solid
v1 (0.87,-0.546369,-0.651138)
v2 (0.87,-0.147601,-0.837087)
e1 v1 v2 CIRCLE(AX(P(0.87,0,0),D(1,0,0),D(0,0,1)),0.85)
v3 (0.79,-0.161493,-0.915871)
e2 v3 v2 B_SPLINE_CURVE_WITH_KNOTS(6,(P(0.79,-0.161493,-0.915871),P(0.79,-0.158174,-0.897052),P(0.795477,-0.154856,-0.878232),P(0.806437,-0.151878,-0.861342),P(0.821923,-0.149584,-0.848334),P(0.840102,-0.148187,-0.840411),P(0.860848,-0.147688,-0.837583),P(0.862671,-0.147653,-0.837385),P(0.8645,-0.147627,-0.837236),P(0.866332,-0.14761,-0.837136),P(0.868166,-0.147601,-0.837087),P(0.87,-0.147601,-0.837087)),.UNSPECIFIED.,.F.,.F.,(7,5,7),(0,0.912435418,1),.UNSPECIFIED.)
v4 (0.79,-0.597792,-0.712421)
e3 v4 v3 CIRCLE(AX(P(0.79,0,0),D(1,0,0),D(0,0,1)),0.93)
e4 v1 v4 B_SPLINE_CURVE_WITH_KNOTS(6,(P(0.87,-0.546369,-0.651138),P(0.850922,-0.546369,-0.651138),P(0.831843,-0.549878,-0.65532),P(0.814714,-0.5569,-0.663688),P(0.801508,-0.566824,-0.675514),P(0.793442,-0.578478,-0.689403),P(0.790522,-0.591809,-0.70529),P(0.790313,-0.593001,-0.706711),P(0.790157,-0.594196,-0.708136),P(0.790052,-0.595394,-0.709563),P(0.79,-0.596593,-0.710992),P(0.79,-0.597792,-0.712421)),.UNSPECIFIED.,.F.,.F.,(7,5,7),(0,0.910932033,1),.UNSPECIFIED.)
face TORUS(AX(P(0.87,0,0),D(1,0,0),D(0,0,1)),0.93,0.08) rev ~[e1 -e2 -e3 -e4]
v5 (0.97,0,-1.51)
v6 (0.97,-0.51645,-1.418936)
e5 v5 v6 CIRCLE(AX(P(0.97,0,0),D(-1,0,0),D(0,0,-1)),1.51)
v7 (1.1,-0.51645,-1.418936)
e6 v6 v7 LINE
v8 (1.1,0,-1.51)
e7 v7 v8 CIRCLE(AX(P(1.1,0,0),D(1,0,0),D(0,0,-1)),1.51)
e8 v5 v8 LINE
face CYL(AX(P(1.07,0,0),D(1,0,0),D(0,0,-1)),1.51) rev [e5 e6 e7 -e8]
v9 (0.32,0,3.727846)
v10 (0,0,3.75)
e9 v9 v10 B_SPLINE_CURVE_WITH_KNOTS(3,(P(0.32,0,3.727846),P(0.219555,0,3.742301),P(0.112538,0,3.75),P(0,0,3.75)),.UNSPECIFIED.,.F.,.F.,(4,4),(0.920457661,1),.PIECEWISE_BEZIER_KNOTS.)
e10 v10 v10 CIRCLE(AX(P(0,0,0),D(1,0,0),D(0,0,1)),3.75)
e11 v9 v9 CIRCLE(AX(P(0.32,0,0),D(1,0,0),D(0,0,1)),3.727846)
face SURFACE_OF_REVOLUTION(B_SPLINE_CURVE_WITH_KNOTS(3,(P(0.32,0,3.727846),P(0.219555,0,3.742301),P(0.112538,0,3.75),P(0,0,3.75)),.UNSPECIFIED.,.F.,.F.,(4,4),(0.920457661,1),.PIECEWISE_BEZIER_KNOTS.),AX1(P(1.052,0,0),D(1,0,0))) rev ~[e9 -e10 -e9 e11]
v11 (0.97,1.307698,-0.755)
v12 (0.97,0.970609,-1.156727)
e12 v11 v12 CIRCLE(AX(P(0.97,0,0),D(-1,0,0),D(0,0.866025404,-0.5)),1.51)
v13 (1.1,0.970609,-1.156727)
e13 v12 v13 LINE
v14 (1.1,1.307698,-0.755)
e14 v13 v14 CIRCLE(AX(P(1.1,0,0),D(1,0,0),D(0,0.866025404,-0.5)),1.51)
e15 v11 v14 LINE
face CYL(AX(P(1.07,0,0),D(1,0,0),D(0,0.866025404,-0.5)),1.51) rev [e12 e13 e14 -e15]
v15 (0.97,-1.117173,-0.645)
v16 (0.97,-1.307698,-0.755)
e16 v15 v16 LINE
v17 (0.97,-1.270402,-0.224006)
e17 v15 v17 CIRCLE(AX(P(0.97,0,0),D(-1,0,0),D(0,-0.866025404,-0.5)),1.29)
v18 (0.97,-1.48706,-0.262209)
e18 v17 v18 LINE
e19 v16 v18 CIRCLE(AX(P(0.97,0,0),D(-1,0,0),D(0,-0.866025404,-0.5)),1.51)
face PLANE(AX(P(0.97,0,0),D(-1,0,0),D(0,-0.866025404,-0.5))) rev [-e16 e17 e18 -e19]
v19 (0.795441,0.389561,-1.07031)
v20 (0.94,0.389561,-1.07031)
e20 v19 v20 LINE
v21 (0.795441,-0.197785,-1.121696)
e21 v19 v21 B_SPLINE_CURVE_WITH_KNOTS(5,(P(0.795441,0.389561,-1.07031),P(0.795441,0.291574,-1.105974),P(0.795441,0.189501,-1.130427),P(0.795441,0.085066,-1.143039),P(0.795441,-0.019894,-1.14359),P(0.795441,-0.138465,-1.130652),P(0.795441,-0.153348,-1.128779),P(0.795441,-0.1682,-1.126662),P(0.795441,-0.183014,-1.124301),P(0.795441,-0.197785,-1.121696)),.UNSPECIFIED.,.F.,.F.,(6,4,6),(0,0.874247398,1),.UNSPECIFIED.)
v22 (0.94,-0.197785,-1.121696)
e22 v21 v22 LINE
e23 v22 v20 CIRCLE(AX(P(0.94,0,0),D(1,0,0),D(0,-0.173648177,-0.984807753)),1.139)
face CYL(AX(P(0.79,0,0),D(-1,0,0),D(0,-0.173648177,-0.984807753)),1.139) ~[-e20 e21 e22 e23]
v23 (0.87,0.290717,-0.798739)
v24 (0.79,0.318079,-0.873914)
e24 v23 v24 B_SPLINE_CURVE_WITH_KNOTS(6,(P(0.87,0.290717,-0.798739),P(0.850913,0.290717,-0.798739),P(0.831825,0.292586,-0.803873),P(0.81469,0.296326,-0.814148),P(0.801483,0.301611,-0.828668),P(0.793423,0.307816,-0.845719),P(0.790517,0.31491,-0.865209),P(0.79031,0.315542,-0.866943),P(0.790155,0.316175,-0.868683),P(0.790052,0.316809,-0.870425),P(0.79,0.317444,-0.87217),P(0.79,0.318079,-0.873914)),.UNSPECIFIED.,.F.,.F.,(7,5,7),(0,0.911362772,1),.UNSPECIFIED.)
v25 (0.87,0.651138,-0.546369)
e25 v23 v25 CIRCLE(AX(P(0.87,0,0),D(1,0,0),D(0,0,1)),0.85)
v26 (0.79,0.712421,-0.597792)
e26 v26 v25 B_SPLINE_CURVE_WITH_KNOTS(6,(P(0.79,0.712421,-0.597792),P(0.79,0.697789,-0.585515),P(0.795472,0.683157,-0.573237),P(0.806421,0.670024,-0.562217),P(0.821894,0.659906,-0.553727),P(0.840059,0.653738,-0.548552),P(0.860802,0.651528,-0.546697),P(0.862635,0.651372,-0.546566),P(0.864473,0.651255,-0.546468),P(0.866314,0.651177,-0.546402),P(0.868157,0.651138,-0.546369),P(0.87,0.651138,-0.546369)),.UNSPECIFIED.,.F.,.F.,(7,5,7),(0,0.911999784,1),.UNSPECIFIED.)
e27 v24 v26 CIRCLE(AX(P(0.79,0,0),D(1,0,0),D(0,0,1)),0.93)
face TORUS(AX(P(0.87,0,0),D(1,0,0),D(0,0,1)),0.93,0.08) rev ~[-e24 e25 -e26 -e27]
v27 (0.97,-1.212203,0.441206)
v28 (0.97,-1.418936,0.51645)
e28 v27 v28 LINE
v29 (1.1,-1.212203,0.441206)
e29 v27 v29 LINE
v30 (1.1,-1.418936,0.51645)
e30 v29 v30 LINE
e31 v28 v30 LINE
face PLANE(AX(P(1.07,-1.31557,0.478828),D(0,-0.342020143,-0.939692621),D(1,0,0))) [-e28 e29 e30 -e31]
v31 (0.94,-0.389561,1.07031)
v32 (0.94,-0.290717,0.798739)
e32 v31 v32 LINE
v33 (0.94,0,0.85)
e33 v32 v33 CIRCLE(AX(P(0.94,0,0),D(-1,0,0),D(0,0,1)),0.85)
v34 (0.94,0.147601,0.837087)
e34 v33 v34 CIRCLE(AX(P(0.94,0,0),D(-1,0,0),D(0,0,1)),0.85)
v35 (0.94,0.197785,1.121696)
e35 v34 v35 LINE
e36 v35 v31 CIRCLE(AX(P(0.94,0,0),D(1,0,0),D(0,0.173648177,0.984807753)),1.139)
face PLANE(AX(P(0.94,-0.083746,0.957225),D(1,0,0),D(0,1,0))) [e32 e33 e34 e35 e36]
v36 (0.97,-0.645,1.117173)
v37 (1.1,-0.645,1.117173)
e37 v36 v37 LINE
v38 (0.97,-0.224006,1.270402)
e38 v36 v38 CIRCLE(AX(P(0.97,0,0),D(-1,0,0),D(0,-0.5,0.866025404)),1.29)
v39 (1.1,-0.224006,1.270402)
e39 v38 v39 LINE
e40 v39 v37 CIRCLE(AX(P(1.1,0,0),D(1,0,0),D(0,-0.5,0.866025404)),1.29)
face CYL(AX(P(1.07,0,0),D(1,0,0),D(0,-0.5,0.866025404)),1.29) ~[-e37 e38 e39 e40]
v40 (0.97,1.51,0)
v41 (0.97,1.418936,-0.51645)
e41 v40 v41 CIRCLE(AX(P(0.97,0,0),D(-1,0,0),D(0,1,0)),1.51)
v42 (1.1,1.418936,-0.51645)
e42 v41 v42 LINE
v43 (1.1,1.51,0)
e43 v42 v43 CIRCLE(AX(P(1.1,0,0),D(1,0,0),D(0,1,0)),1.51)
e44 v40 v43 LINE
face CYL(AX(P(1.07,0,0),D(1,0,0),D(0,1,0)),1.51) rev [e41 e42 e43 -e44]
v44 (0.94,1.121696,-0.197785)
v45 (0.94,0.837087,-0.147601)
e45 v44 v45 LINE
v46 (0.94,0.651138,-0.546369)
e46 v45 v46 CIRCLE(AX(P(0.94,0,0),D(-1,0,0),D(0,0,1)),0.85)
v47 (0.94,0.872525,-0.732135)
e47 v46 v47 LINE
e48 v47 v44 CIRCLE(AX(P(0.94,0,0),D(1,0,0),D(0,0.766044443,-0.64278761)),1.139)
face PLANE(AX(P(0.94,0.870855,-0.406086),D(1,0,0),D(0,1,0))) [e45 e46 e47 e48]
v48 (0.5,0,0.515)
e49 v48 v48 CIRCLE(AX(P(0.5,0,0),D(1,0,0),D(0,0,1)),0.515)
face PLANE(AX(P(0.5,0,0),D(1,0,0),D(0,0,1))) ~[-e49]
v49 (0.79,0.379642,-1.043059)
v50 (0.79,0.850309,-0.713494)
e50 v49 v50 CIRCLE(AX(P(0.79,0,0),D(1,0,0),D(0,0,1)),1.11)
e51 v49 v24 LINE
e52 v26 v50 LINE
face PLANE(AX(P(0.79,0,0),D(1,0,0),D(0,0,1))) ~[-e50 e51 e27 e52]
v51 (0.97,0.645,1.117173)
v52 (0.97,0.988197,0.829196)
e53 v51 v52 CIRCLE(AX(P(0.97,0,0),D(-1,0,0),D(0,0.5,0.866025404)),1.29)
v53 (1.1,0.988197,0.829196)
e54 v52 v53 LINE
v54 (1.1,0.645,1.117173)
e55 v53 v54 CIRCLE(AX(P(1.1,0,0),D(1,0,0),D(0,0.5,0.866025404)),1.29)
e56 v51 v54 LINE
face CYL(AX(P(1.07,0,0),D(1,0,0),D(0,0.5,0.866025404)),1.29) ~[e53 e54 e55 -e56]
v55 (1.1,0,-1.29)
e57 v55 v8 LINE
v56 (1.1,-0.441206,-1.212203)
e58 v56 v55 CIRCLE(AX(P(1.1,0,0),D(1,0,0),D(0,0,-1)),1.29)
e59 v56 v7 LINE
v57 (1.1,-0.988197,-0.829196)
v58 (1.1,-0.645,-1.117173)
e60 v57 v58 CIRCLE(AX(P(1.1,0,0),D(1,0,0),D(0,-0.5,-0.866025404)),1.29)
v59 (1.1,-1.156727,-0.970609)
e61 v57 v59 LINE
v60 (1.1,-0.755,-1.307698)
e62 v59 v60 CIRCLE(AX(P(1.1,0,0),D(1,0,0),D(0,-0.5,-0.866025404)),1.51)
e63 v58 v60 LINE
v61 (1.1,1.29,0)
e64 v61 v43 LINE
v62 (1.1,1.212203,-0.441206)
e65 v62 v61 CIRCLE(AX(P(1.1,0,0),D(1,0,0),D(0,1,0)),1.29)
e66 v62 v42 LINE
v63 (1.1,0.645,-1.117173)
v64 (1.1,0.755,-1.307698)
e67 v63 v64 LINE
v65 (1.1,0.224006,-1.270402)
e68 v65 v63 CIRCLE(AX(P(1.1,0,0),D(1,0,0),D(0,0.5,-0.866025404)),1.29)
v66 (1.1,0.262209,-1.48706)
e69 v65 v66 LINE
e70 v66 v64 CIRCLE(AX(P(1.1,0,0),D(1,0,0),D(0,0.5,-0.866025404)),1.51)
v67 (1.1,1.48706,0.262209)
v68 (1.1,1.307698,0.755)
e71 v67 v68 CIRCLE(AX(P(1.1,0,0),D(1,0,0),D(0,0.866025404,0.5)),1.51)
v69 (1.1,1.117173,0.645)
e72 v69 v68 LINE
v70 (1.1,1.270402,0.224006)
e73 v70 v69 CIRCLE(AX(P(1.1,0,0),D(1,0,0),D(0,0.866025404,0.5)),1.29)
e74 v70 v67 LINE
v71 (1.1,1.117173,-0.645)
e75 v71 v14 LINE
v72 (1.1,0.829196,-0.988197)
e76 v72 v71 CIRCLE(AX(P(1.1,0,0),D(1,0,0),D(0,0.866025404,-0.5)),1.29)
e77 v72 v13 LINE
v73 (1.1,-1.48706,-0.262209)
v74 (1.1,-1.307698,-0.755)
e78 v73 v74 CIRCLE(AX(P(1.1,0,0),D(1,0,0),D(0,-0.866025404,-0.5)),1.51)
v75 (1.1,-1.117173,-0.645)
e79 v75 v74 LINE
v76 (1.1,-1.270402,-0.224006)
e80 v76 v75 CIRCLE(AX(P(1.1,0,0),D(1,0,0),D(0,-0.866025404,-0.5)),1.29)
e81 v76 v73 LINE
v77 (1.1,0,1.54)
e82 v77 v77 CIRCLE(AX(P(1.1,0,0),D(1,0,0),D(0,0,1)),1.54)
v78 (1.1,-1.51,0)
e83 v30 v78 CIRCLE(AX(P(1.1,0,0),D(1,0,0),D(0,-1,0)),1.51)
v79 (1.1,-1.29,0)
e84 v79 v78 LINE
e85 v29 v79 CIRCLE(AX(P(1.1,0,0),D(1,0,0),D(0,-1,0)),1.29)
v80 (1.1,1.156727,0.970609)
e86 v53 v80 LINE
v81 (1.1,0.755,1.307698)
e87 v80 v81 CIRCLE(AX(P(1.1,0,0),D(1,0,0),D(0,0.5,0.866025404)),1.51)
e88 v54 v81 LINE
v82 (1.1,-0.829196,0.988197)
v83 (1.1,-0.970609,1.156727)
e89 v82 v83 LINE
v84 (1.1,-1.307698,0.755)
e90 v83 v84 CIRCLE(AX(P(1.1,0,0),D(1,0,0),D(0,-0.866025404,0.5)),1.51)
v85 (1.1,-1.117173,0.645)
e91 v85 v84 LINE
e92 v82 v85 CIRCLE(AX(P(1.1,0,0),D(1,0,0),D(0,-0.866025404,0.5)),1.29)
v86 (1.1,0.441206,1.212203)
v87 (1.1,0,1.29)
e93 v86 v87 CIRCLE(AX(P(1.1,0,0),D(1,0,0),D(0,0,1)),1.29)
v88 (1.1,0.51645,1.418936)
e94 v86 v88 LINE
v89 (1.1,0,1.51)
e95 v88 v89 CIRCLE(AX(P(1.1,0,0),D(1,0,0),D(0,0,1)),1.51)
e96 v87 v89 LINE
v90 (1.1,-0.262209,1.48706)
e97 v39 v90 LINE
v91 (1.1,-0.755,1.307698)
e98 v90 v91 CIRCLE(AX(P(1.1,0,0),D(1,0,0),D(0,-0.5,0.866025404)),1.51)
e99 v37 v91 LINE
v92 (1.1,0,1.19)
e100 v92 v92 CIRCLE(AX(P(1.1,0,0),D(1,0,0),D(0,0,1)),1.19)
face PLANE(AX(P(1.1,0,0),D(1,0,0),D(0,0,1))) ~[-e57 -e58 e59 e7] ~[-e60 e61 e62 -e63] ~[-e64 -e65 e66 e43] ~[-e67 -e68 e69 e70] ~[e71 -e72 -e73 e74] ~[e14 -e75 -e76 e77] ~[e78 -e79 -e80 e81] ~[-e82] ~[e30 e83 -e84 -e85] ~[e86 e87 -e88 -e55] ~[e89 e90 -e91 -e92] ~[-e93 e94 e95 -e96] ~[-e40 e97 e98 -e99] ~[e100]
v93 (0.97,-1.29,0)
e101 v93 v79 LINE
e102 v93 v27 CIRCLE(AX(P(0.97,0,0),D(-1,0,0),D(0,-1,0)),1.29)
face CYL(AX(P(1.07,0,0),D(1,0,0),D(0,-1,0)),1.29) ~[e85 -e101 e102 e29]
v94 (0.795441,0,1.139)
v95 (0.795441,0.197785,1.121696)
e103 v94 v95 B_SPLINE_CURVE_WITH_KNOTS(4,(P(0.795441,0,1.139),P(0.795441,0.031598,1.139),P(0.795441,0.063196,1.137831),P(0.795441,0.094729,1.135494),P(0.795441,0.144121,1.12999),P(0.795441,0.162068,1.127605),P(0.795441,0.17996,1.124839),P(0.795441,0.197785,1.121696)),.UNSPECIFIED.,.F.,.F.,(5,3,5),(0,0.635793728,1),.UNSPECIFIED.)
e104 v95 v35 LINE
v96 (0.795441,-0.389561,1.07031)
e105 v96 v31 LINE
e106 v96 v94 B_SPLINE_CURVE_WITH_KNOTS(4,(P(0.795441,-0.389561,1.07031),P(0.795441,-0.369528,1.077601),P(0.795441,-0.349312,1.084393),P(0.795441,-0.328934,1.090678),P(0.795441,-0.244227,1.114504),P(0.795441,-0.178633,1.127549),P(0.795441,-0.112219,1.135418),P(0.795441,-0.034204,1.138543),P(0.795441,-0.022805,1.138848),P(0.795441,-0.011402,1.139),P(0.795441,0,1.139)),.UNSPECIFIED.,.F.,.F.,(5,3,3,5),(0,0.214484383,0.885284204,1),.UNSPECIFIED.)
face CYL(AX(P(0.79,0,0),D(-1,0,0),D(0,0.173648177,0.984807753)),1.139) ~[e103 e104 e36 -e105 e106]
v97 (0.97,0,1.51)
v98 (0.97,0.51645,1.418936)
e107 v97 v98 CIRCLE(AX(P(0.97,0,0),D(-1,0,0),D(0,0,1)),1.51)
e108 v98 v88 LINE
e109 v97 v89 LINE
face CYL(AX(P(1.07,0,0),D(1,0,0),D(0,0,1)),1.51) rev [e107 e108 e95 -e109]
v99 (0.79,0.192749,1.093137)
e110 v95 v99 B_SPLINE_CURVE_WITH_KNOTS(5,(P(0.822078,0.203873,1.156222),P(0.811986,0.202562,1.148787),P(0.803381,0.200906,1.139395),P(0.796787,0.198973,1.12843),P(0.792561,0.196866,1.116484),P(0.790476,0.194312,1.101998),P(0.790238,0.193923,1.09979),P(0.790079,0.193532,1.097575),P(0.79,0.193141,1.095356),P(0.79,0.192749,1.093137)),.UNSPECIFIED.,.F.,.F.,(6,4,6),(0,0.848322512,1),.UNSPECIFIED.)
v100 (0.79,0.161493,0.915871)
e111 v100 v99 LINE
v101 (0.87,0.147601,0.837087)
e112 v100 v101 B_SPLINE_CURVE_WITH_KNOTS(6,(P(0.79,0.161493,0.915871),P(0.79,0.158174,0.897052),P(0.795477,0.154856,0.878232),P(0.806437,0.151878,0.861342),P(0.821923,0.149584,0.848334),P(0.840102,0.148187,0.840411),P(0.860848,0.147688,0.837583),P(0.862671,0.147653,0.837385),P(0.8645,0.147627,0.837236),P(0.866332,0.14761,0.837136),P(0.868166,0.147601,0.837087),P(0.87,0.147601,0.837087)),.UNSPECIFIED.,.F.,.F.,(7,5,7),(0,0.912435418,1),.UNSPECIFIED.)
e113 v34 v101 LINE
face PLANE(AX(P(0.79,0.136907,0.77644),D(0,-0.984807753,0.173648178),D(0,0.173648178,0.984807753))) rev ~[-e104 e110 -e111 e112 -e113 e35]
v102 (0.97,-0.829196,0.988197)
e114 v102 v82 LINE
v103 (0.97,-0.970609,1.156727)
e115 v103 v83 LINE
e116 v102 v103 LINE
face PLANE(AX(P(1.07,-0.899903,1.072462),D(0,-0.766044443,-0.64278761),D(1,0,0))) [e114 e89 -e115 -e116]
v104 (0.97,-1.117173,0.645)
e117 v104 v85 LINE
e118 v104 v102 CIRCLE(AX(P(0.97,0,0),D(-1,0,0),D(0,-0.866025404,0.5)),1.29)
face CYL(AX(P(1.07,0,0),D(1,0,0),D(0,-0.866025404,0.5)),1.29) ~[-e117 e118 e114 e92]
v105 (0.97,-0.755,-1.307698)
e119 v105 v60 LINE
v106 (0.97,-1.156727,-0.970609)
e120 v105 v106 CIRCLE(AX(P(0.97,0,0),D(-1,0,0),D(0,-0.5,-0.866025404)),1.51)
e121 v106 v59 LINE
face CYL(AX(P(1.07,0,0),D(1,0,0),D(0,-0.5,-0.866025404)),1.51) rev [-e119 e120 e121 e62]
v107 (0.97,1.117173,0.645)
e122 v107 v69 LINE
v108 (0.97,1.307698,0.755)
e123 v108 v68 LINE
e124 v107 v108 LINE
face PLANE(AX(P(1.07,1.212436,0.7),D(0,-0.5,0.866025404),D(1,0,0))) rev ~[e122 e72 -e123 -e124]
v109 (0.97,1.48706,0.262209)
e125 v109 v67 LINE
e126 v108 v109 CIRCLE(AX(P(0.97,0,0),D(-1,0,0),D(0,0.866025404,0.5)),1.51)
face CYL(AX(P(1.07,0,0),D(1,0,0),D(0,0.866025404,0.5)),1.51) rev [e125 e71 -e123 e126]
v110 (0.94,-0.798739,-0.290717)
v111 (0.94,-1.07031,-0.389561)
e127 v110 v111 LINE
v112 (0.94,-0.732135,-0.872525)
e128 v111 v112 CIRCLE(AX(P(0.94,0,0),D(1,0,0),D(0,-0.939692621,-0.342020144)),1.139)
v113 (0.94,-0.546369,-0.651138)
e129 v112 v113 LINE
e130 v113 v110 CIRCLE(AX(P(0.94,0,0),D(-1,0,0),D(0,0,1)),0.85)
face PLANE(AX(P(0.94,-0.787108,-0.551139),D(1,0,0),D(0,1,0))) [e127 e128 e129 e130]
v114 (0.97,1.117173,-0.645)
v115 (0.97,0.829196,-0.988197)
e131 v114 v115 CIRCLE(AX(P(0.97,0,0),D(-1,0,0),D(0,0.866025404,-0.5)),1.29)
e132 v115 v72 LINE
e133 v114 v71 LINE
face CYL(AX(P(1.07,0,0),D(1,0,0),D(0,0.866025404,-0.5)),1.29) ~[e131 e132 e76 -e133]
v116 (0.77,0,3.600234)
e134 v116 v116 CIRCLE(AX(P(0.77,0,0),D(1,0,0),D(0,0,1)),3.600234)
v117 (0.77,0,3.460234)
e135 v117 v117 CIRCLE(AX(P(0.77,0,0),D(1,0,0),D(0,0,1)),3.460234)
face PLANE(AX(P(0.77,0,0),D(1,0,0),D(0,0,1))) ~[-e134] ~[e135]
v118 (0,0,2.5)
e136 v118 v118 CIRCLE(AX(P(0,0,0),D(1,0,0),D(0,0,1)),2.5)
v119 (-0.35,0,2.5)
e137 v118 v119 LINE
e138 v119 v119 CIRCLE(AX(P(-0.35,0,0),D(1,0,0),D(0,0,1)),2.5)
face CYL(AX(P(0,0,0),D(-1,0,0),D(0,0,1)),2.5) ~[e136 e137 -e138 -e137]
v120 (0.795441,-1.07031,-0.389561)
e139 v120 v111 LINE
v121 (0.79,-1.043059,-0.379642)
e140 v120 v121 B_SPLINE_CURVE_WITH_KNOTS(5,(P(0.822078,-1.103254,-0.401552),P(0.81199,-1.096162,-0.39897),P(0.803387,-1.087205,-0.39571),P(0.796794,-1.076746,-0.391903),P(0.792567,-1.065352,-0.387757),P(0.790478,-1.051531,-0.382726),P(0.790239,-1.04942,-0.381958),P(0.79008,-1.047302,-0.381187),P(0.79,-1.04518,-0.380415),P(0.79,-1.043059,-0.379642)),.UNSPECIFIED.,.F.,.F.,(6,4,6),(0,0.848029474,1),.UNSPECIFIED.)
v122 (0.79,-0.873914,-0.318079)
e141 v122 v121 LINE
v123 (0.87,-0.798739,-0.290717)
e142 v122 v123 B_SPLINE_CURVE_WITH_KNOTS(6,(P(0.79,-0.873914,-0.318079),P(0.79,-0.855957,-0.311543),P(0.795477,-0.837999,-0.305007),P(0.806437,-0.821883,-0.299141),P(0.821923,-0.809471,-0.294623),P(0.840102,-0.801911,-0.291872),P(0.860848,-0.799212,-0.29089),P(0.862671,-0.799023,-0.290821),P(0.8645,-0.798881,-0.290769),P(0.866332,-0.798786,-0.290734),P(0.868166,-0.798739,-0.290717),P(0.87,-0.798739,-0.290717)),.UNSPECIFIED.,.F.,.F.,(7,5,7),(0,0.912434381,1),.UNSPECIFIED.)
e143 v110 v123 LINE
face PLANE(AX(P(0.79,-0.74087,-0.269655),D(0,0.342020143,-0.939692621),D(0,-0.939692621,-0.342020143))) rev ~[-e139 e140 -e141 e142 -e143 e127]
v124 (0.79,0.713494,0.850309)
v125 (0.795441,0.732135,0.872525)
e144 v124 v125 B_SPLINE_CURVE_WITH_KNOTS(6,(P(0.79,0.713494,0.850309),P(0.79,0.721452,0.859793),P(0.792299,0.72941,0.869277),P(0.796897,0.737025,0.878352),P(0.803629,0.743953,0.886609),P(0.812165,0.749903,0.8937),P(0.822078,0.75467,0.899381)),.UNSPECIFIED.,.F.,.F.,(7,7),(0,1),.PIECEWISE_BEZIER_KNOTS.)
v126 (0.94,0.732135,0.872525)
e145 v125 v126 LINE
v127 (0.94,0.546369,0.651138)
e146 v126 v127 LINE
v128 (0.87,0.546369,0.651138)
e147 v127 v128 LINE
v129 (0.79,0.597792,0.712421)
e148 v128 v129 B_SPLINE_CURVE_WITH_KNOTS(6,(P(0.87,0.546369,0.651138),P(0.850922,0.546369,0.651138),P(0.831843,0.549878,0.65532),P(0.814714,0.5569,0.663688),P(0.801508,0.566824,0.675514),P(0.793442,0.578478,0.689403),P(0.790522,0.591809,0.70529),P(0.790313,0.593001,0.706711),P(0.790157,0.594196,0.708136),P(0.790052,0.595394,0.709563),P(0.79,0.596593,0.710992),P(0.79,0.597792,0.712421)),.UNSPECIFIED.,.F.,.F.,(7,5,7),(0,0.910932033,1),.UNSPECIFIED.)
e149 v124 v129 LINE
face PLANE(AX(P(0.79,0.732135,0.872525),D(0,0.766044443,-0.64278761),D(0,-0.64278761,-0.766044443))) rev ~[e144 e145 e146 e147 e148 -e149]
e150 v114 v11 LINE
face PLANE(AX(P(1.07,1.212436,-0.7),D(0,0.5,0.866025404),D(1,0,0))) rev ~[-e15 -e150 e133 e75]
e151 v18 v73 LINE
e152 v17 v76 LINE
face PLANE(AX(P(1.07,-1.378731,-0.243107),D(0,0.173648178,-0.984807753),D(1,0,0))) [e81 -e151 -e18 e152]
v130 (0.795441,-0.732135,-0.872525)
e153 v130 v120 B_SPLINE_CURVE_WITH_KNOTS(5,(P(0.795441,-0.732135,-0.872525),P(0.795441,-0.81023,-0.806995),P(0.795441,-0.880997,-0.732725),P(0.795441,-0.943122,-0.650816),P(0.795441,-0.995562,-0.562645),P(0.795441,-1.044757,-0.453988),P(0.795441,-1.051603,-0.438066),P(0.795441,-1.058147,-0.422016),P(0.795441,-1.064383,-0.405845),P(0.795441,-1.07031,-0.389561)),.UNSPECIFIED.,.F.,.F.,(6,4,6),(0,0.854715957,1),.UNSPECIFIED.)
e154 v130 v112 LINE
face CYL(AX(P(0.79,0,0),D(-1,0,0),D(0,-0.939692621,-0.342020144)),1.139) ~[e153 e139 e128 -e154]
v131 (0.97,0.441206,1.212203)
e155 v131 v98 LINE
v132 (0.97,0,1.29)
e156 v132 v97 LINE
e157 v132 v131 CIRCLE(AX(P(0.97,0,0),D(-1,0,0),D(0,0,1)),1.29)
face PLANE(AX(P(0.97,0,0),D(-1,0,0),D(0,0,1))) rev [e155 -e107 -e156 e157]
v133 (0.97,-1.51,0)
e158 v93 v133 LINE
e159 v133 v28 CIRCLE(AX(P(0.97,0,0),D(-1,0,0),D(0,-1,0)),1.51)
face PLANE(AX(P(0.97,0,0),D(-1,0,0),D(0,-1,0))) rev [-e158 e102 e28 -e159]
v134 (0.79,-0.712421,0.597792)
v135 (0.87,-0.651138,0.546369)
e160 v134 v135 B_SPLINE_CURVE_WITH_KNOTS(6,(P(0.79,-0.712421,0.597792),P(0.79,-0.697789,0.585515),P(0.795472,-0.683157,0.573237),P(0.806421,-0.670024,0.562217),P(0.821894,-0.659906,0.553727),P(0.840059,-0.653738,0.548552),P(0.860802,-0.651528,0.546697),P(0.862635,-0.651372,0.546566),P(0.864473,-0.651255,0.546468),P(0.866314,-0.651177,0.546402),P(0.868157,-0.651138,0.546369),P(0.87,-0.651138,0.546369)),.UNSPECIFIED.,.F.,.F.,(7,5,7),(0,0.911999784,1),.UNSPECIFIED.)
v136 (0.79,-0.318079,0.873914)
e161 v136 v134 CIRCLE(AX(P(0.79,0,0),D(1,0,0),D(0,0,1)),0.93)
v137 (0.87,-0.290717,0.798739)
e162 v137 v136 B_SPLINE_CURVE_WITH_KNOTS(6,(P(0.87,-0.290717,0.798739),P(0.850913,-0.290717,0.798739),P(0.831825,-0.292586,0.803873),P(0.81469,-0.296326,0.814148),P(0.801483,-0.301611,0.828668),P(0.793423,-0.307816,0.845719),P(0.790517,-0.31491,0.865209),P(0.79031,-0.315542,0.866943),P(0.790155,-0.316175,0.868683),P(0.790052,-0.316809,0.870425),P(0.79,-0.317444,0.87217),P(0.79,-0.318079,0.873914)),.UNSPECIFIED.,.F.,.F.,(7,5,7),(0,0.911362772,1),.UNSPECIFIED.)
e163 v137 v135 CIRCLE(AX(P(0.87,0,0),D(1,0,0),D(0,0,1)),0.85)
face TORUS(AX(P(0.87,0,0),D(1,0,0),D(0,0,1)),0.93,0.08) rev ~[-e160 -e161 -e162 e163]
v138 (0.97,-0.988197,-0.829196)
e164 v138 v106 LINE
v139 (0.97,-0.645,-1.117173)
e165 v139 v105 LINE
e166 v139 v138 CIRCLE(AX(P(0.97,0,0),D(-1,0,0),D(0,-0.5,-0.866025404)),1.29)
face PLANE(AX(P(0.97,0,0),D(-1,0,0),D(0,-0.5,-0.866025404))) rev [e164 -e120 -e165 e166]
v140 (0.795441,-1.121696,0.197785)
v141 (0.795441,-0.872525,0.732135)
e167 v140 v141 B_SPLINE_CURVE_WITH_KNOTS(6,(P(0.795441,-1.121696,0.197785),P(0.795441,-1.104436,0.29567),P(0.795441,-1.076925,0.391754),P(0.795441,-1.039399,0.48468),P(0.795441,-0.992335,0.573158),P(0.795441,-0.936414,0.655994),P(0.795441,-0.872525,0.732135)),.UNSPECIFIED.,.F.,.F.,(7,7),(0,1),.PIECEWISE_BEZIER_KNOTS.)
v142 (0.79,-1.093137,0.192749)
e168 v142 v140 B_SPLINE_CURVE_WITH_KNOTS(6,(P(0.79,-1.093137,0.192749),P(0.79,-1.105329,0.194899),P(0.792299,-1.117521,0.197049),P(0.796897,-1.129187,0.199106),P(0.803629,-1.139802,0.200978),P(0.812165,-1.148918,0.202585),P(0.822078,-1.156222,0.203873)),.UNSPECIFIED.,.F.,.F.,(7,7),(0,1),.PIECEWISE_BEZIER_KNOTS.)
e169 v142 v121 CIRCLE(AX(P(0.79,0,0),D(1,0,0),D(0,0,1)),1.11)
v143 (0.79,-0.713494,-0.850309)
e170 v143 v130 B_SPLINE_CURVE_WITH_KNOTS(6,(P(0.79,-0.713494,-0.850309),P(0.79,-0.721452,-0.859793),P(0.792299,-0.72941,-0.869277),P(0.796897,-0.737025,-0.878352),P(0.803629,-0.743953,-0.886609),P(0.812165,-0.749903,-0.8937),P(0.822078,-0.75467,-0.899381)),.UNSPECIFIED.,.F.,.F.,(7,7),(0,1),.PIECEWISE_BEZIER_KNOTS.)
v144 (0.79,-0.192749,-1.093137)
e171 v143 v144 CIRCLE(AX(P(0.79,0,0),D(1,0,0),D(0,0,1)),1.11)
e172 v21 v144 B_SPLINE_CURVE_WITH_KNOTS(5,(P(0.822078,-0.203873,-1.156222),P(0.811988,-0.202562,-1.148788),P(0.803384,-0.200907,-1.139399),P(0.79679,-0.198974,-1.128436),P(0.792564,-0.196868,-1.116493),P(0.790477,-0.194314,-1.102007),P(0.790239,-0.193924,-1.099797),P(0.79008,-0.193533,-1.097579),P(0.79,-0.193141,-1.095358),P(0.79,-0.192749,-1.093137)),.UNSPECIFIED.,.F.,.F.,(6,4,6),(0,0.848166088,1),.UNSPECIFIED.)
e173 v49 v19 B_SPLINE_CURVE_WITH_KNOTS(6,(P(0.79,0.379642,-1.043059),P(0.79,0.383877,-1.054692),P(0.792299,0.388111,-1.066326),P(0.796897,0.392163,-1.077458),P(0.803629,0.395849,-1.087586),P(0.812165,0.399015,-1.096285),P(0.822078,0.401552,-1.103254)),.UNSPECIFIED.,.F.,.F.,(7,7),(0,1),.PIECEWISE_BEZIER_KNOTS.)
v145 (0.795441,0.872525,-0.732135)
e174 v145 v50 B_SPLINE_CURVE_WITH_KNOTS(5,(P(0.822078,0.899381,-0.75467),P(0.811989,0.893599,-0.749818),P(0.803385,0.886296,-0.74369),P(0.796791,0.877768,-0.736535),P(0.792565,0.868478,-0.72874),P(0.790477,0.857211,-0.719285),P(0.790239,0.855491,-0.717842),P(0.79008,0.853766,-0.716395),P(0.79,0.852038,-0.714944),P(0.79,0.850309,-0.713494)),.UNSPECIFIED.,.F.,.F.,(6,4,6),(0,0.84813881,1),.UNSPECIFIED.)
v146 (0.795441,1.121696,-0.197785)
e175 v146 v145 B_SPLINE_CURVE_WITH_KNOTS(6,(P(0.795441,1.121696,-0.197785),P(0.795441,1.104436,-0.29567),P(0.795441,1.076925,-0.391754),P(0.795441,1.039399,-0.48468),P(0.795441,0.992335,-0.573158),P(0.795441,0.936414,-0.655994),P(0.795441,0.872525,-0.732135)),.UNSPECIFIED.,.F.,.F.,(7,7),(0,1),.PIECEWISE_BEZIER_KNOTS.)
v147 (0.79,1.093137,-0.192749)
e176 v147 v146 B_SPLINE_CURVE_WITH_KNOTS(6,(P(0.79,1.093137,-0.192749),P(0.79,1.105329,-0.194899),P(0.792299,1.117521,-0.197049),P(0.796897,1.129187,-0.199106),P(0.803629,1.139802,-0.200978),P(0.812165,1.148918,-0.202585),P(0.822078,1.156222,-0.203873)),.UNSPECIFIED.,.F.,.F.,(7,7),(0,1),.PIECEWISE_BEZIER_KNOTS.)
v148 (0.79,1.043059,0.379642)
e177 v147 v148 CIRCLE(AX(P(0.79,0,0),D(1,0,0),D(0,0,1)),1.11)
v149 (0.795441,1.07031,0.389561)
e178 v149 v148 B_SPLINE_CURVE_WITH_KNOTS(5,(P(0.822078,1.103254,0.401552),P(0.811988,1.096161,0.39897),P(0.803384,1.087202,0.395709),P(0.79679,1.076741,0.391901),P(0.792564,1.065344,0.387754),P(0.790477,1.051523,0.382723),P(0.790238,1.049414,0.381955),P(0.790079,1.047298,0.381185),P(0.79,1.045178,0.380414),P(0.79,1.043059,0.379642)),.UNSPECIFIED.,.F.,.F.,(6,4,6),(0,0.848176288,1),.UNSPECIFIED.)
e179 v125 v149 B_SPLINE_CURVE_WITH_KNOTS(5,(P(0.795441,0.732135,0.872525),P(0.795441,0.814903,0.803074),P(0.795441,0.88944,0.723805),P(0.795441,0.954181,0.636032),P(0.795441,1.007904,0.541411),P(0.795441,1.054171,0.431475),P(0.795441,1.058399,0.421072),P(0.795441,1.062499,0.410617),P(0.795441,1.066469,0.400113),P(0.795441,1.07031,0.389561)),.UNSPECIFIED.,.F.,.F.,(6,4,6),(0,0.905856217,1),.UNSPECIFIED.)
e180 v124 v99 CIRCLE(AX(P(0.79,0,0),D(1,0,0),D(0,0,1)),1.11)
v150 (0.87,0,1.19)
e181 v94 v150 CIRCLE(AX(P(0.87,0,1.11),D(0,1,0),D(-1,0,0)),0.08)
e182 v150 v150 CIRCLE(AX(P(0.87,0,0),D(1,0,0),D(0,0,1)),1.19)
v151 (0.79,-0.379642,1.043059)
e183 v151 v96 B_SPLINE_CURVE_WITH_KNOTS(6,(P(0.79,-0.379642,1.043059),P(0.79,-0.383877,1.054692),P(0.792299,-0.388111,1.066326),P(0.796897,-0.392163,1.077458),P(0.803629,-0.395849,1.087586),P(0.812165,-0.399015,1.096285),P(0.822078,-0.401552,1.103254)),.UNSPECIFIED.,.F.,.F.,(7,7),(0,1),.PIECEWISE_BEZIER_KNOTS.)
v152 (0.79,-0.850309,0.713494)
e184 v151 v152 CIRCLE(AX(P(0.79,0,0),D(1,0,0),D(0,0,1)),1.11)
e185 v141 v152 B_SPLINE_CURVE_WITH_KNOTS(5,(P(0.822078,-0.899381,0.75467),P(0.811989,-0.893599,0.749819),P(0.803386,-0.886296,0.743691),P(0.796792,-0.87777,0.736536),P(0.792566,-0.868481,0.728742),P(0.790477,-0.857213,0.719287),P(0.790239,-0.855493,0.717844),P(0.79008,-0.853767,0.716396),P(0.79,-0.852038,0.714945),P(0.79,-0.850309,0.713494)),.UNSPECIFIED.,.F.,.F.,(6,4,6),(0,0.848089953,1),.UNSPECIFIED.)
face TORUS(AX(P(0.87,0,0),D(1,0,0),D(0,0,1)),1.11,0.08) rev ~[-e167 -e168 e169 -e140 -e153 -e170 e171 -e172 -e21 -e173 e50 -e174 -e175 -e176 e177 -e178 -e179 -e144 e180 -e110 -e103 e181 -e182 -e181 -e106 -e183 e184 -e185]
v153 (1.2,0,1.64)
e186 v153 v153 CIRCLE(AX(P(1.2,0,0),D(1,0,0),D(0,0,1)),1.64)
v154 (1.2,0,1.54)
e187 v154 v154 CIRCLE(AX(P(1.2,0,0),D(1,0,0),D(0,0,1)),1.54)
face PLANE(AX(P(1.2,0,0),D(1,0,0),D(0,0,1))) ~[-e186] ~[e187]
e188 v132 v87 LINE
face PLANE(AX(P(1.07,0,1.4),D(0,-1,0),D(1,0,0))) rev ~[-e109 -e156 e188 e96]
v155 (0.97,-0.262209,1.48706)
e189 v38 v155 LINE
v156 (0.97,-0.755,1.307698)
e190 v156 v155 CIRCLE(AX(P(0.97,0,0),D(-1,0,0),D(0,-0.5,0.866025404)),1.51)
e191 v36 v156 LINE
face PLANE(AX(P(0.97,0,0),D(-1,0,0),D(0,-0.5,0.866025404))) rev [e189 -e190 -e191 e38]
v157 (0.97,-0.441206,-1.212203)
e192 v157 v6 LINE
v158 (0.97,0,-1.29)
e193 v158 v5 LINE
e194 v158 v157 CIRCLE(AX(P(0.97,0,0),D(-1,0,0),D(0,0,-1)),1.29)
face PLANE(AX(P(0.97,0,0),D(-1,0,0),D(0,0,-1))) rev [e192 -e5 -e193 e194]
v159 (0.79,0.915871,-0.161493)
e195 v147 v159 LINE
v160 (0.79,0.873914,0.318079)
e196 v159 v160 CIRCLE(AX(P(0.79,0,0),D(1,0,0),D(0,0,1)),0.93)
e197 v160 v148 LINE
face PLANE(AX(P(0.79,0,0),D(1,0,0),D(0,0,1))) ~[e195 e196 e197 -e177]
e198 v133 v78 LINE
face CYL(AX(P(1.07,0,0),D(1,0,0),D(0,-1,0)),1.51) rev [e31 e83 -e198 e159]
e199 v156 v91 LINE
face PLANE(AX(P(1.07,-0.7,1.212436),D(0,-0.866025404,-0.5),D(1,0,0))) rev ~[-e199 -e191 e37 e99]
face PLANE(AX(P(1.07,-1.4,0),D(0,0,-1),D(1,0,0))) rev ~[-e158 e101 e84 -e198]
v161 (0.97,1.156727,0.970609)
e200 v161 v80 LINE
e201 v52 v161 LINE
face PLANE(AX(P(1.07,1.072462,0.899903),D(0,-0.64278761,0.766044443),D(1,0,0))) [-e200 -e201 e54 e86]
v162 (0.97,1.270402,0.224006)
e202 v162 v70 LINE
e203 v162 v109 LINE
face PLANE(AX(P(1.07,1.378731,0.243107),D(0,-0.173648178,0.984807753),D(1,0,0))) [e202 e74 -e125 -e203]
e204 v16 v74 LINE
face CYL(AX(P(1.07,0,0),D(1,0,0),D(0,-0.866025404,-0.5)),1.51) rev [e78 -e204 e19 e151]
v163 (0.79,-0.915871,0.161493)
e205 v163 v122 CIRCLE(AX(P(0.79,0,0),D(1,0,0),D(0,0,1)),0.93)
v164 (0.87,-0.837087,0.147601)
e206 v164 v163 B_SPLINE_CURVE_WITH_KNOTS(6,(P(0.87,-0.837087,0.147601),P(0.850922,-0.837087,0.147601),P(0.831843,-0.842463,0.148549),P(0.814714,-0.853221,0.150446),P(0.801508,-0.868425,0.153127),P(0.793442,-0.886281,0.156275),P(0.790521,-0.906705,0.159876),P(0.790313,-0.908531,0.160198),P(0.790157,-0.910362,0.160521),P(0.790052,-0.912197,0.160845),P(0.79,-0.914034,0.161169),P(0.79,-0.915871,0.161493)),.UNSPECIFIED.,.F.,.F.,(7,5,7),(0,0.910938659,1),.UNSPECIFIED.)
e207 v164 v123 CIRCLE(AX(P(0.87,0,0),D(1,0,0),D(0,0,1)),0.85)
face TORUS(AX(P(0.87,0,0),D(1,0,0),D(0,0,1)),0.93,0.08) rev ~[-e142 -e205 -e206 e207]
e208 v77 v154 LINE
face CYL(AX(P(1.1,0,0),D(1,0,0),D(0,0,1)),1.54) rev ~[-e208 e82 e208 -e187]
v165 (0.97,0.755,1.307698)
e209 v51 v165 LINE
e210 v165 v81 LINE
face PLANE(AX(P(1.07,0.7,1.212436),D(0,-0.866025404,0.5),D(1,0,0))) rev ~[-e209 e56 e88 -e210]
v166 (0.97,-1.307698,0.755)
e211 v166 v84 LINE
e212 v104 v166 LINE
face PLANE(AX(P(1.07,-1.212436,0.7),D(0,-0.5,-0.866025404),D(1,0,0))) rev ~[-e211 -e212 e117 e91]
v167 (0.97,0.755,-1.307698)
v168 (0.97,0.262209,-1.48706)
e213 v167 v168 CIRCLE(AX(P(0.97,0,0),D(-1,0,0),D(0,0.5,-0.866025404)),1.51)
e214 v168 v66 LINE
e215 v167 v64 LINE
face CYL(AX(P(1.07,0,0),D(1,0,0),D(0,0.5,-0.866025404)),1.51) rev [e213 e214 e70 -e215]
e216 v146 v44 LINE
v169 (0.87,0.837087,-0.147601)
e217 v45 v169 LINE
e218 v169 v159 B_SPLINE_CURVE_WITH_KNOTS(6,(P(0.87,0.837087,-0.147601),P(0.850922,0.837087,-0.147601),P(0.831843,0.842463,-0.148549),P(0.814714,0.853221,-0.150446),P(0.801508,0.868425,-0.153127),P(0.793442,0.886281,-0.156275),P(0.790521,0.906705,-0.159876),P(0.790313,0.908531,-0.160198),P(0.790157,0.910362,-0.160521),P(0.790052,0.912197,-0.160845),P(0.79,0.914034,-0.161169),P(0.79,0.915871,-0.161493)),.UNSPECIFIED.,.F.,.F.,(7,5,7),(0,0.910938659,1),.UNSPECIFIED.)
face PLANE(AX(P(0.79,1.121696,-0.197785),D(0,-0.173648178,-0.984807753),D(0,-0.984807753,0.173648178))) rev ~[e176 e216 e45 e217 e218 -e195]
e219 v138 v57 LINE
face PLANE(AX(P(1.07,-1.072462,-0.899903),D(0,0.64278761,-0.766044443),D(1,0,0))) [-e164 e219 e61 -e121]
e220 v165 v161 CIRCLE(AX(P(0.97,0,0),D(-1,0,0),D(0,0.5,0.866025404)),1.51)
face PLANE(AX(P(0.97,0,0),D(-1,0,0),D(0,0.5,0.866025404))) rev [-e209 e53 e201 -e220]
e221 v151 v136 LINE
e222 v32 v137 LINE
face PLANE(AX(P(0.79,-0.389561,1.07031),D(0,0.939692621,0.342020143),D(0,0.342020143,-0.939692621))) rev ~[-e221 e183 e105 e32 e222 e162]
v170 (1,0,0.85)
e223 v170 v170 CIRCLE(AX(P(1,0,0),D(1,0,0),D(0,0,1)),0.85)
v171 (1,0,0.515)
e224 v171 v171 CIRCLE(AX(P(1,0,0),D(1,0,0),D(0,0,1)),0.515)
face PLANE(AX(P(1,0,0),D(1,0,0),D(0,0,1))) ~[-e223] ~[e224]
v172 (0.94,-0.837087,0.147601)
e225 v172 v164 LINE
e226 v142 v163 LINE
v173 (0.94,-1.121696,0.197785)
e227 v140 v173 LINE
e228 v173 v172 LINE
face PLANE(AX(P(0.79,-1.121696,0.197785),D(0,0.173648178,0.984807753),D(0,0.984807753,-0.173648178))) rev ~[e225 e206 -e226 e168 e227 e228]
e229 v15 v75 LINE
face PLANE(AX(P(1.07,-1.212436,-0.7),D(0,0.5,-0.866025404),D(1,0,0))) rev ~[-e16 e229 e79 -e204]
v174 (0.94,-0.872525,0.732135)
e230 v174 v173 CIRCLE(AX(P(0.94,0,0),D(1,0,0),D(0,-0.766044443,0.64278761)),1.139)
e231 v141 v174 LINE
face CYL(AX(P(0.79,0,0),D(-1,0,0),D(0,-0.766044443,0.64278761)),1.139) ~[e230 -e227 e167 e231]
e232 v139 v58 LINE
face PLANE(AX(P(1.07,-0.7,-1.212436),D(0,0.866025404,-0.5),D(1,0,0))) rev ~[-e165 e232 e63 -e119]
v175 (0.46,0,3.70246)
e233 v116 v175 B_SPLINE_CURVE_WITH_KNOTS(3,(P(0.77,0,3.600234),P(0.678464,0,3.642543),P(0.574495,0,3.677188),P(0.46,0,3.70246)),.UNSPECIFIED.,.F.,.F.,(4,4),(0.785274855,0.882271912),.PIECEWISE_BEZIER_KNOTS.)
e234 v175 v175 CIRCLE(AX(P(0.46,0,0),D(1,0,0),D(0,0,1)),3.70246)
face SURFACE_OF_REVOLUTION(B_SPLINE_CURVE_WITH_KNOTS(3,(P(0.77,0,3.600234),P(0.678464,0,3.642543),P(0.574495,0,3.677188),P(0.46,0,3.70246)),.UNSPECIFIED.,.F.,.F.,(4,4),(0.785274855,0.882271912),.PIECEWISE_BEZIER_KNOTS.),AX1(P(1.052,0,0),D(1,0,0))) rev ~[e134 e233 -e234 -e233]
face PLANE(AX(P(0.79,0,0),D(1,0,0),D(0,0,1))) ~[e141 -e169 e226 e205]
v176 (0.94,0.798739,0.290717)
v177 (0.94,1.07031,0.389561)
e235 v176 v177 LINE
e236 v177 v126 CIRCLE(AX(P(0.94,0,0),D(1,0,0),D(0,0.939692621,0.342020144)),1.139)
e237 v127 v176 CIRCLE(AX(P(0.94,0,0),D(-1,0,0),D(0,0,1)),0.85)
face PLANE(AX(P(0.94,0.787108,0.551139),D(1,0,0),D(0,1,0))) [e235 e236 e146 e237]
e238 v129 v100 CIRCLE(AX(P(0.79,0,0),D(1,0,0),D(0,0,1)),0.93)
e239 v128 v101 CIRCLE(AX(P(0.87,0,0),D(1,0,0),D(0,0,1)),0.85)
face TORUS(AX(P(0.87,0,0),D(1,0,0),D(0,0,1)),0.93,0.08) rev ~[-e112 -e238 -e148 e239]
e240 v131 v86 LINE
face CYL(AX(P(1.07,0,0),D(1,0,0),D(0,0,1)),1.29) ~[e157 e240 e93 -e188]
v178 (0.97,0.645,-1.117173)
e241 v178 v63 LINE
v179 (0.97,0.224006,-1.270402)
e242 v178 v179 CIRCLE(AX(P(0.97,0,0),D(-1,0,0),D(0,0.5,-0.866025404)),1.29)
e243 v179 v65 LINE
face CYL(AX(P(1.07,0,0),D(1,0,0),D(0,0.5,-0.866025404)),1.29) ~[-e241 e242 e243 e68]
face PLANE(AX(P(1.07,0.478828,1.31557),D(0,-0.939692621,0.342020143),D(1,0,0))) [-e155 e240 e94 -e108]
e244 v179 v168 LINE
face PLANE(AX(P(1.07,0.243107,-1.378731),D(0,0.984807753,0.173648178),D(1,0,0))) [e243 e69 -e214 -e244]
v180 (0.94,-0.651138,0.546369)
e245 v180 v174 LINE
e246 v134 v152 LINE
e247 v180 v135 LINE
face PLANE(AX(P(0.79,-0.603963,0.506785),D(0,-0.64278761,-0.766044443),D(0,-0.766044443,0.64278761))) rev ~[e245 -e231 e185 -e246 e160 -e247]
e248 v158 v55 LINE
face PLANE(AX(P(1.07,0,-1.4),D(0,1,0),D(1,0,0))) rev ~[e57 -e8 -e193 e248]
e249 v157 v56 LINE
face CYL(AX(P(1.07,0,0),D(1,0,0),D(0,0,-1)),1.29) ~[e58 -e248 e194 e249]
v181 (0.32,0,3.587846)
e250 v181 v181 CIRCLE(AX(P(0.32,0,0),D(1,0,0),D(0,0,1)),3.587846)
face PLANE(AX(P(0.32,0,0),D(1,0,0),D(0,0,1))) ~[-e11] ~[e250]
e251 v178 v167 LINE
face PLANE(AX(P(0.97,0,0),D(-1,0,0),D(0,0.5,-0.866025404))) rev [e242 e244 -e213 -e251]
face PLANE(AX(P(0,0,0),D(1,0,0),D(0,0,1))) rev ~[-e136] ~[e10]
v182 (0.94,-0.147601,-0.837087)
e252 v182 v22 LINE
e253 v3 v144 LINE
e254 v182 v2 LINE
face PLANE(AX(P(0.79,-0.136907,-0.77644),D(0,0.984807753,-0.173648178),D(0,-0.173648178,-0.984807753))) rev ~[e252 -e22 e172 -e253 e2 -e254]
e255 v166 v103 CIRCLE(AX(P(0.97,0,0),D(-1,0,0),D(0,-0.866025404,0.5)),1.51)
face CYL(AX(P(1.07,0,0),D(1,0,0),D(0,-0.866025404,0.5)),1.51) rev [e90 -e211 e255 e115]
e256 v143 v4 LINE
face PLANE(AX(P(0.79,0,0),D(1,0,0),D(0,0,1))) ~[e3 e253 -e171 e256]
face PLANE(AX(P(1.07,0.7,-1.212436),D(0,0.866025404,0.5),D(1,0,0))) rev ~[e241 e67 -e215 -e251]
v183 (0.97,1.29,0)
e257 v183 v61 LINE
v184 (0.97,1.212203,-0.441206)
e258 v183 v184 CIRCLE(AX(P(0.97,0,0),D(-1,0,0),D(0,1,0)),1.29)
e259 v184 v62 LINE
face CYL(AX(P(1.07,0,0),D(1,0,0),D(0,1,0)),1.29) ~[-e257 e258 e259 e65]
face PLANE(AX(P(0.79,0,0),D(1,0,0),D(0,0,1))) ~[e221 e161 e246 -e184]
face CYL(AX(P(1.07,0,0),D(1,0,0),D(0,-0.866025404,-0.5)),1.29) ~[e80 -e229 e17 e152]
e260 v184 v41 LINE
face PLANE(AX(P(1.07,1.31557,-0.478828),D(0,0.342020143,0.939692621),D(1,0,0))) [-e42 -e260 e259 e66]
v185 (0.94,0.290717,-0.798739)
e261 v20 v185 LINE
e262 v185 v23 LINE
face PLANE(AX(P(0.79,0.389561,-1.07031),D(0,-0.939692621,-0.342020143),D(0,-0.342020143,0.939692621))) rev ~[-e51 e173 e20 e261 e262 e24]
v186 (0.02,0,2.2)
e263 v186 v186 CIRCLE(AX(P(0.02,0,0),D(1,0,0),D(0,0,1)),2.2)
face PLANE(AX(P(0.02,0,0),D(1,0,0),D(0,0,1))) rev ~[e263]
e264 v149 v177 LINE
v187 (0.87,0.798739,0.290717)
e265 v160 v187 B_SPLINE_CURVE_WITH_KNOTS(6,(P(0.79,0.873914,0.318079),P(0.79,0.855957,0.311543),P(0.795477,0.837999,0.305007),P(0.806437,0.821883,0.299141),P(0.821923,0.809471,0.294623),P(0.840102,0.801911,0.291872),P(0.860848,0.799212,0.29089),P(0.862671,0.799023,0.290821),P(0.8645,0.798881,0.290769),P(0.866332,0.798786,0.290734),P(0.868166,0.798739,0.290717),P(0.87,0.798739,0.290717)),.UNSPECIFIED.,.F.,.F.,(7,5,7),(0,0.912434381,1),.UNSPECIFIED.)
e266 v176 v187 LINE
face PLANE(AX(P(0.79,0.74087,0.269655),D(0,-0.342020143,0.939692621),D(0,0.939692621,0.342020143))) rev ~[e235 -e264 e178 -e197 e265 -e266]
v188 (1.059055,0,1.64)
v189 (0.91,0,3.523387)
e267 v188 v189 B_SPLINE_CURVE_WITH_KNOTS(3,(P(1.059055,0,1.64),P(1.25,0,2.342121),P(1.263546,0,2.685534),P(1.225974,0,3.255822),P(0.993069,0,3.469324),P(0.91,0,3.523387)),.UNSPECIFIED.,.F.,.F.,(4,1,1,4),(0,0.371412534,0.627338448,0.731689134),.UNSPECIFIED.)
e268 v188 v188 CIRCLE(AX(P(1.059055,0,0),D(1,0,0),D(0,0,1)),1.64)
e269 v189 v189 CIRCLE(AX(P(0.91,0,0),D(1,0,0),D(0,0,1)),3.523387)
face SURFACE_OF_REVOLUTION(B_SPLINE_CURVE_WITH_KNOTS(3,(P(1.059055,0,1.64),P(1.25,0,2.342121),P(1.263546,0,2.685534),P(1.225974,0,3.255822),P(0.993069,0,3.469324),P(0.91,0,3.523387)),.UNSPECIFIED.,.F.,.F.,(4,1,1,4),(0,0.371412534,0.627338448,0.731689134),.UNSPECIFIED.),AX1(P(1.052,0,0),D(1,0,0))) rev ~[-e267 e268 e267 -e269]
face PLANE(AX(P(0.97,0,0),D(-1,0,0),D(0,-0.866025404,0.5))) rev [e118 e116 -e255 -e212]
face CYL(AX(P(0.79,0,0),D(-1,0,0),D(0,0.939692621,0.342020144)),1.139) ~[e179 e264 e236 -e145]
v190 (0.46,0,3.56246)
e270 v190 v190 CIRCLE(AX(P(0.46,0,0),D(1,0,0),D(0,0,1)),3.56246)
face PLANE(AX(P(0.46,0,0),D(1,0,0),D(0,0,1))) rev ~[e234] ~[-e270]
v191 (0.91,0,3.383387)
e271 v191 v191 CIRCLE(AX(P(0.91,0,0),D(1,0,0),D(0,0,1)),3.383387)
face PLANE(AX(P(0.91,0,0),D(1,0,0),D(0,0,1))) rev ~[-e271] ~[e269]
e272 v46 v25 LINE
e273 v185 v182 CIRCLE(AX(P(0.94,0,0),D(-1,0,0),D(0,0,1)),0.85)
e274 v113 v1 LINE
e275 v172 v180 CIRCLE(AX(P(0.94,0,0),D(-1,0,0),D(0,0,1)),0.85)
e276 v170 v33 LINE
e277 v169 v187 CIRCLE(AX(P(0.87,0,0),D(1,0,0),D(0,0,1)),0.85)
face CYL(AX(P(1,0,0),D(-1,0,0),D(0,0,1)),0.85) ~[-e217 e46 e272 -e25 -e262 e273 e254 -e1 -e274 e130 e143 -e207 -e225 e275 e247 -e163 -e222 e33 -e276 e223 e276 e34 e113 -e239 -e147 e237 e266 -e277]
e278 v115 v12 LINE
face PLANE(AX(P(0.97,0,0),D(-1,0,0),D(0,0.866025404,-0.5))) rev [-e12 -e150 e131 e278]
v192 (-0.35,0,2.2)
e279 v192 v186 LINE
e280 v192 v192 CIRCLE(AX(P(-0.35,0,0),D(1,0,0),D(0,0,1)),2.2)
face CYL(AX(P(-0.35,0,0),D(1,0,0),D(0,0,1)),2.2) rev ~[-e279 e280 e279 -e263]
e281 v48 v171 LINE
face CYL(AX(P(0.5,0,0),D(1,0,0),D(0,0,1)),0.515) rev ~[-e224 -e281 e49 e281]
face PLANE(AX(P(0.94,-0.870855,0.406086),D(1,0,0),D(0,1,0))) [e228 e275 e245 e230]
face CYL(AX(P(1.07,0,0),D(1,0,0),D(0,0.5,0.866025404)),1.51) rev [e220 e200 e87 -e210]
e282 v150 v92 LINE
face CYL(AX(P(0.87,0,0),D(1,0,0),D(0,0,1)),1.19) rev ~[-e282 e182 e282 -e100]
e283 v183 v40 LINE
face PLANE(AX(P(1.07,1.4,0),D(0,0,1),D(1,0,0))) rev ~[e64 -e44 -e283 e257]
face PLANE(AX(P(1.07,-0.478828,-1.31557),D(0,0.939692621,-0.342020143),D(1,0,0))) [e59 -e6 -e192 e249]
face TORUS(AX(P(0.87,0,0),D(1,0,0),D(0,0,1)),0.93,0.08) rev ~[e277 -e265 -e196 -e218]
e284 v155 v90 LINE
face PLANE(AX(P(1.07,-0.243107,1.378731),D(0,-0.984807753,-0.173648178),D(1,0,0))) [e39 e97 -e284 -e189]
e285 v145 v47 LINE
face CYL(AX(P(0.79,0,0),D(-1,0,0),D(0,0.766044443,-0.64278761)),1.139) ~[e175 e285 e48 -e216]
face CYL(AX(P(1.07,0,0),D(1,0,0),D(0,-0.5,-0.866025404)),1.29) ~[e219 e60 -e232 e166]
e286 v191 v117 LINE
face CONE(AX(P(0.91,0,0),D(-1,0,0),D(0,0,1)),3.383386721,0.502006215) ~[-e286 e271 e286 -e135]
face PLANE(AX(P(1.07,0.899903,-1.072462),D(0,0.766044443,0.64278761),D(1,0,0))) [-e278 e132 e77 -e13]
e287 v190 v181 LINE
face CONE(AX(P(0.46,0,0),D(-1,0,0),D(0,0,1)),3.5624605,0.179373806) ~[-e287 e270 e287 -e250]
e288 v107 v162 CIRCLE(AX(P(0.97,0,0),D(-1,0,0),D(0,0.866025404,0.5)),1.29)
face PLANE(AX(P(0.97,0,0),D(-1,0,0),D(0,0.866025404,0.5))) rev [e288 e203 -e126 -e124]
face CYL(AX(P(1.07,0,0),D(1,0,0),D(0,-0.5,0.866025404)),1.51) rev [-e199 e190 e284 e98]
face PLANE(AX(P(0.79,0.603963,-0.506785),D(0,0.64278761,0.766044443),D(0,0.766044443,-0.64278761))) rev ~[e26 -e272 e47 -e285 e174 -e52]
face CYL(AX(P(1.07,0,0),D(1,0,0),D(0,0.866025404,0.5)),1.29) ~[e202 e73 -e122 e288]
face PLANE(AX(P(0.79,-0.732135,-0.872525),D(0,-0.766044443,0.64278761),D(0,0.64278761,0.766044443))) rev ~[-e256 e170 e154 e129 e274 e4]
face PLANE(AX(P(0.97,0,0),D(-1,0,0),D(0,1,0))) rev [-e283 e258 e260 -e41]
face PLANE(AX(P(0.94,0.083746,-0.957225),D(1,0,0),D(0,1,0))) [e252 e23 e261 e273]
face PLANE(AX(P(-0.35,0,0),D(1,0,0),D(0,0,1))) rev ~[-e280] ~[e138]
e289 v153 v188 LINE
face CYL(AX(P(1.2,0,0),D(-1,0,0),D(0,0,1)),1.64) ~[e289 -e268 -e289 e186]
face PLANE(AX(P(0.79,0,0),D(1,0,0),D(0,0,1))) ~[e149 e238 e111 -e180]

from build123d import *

# Parameters (mm, degrees)
F2_W            = 0.2
F2_H            = 0.22
F3_ANGLE        = 20
F3_COPIES_COUNT = 12
F5_DEPTH        = 0.15


# Not quite as in the source:
# - a pattern or mirror of a feature is missing from the dataset's text; its kind, count and spacing are read off the source's solid


with BuildPart() as f1:
    # F0 (on Front) → F1 (revolve)
    with BuildSketch(Plane.XZ):
        with BuildLine():
            Line((1, 0.85), (0.87, 0.85))
            ThreePointArc((0.87, 0.85), (0.8134314575, 0.8734314575), (0.79, 0.93))
            Line((0.79, 0.93), (0.79, 1.11))
            ThreePointArc((0.79, 1.11), (0.8134314575, 1.1665685425), (0.87, 1.19))
            Line((0.87, 1.19), (1.1, 1.19))
            Line((1.1, 1.19), (1.1, 1.54))
            Line((1.1, 1.54), (1.2, 1.54))
            Line((1.2, 1.54), (1.2, 1.64))
            Line((1.2, 1.64), (1.12, 1.64))
            Line((1.12, 1.64), (1.0590550792, 1.64))
            add(Edge.make_bspline(
                [(1.0590550792, 1.64), (1.25, 2.3421209771), (1.2635455001, 2.685534462), (1.2259744013, 3.2558219262), (0.9930693577, 3.4693235058), (0.91, 3.5233867214)],
                knots=[0, 0, 0, 0, 0.3714125336, 0.6273384476, 0.7316891336, 0.7316891336, 0.7316891336, 0.7316891336], degree=3))
            Line((0.91, 3.5233867214), (0.91, 3.3833867214))
            Line((0.91, 3.3833867214), (0.77, 3.4602341654))
            Line((0.77, 3.4602341654), (0.77, 3.6002341654))
            add(Edge.make_bspline(
                [(0.77, 3.6002341654), (0.6784642229, 3.6425426702), (0.5744947558, 3.6771881754), (0.46, 3.7024604996)],
                knots=[0.7852748547, 0.7852748547, 0.7852748547, 0.7852748547, 0.8822719118, 0.8822719118, 0.8822719118, 0.8822719118], degree=3))
            Line((0.46, 3.7024604996), (0.46, 3.5624604996))
            Line((0.46, 3.5624604996), (0.32, 3.5878456739))
            Line((0.32, 3.5878456739), (0.32, 3.7278456739))
            add(Edge.make_bspline(
                [(0.32, 3.7278456739), (0.2195553432, 3.7423008552), (0.1125378698, 3.75), (0, 3.75)],
                knots=[0.9204576606, 0.9204576606, 0.9204576606, 0.9204576606, 1, 1, 1, 1], degree=3))
            Line((0, 3.75), (0, 2.75))
            Line((0, 2.75), (0, 2.5))
            Line((0, 2.5), (-0.35, 2.5))
            Line((-0.35, 2.5), (-0.35, 2.2))
            Line((-0.35, 2.2), (0.02, 2.2))
            Line((0.02, 2.2), (0.02, 2.15))
            Line((0.02, 2.15), (0.02, 0))
            Line((0.02, 0), (0.5, 0))
            Line((0.5, 0), (0.5, 0.515))
            Line((0.5, 0.515), (1, 0.515))
            Line((1, 0.515), (1, 0.85))
        make_face()
    revolve(axis=Axis((1.052, 0, 0), (1, 0, 0)))

    # F2 (on Front) → F3 (revolve, cut)
    with BuildSketch(Plane.XZ):
        with Locations((1.07, 1.4)):
            Rectangle(F2_W, F2_H)
    f3 = revolve(axis=Axis((1.36, 0, 0), (-1, 0, 0)), revolution_arc=F3_ANGLE, mode=Mode.SUBTRACT)

    # F3_copies: F3 ×12 about axis
    f3_copies_axis = Axis((0, 0, 0), (1, 0, 0))
    for i in range(1, F3_COPIES_COUNT):
        add(f3.rotate(f3_copies_axis, i * 360 / F3_COPIES_COUNT), mode=Mode.SUBTRACT)

    # F4 (on face) → F5 (join)
    with BuildSketch(Plane.YZ.offset(0.79)):
        with BuildLine():
            Line((-0.3895609432, 1.0703098951), (-0.2696546218, 0.7408699845))
            ThreePointArc((-0.2696546218, 0.7408699845), (-0.0687151015, 0.7854172037), (0.1369072395, 0.7764395384))
            Line((0.1369072395, 0.7764395384), (0.1977852744, 1.1216960307))
            ThreePointArc((0.1977852744, 1.1216960307), (-0.099270391, 1.1346657611), (-0.3895609432, 1.0703098951))
        make_face()
        with BuildLine():
            Line((-1.1216960307, 0.1977852744), (-0.7764395384, 0.1369072395))
            ThreePointArc((-0.7764395384, 0.1369072395), (-0.7145488017, 0.3331995784), (-0.603962745, 0.5067849166))
            Line((-0.603962745, 0.5067849166), (-0.8725246207, 0.7321350874))
            ThreePointArc((-0.8725246207, 0.7321350874), (-1.0322845694, 0.4813622001), (-1.1216960307, 0.1977852744))
        make_face()
        with BuildLine():
            Line((-0.7321350874, -0.8725246207), (-0.5067849166, -0.603962745))
            ThreePointArc((-0.5067849166, -0.603962745), (-0.6458337002, -0.4522176253), (-0.7408699845, -0.2696546218))
            Line((-0.7408699845, -0.2696546218), (-1.0703098951, -0.3895609432))
            ThreePointArc((-1.0703098951, -0.3895609432), (-0.9330141784, -0.653303561), (-0.7321350874, -0.8725246207))
        make_face()
        with BuildLine():
            Line((0.3895609432, -1.0703098951), (0.2696546218, -0.7408699845))
            ThreePointArc((0.2696546218, -0.7408699845), (0.0687151015, -0.7854172037), (-0.1369072395, -0.7764395384))
            Line((-0.1369072395, -0.7764395384), (-0.1977852744, -1.1216960307))
            ThreePointArc((-0.1977852744, -1.1216960307), (0.099270391, -1.1346657611), (0.3895609432, -1.0703098951))
        make_face()
        with BuildLine():
            Line((1.1216960307, -0.1977852744), (0.7764395384, -0.1369072395))
            ThreePointArc((0.7764395384, -0.1369072395), (0.7145488017, -0.3331995784), (0.603962745, -0.5067849166))
            Line((0.603962745, -0.5067849166), (0.8725246207, -0.7321350874))
            ThreePointArc((0.8725246207, -0.7321350874), (1.0322845694, -0.4813622001), (1.1216960307, -0.1977852744))
        make_face()
        with BuildLine():
            Line((0.7321350874, 0.8725246207), (0.5067849166, 0.603962745))
            ThreePointArc((0.5067849166, 0.603962745), (0.6458337002, 0.4522176253), (0.7408699845, 0.2696546218))
            Line((0.7408699845, 0.2696546218), (1.0703098951, 0.3895609432))
            ThreePointArc((1.0703098951, 0.3895609432), (0.9330141784, 0.653303561), (0.7321350874, 0.8725246207))
        make_face()
    extrude(amount=F5_DEPTH)


solid = f1.part
